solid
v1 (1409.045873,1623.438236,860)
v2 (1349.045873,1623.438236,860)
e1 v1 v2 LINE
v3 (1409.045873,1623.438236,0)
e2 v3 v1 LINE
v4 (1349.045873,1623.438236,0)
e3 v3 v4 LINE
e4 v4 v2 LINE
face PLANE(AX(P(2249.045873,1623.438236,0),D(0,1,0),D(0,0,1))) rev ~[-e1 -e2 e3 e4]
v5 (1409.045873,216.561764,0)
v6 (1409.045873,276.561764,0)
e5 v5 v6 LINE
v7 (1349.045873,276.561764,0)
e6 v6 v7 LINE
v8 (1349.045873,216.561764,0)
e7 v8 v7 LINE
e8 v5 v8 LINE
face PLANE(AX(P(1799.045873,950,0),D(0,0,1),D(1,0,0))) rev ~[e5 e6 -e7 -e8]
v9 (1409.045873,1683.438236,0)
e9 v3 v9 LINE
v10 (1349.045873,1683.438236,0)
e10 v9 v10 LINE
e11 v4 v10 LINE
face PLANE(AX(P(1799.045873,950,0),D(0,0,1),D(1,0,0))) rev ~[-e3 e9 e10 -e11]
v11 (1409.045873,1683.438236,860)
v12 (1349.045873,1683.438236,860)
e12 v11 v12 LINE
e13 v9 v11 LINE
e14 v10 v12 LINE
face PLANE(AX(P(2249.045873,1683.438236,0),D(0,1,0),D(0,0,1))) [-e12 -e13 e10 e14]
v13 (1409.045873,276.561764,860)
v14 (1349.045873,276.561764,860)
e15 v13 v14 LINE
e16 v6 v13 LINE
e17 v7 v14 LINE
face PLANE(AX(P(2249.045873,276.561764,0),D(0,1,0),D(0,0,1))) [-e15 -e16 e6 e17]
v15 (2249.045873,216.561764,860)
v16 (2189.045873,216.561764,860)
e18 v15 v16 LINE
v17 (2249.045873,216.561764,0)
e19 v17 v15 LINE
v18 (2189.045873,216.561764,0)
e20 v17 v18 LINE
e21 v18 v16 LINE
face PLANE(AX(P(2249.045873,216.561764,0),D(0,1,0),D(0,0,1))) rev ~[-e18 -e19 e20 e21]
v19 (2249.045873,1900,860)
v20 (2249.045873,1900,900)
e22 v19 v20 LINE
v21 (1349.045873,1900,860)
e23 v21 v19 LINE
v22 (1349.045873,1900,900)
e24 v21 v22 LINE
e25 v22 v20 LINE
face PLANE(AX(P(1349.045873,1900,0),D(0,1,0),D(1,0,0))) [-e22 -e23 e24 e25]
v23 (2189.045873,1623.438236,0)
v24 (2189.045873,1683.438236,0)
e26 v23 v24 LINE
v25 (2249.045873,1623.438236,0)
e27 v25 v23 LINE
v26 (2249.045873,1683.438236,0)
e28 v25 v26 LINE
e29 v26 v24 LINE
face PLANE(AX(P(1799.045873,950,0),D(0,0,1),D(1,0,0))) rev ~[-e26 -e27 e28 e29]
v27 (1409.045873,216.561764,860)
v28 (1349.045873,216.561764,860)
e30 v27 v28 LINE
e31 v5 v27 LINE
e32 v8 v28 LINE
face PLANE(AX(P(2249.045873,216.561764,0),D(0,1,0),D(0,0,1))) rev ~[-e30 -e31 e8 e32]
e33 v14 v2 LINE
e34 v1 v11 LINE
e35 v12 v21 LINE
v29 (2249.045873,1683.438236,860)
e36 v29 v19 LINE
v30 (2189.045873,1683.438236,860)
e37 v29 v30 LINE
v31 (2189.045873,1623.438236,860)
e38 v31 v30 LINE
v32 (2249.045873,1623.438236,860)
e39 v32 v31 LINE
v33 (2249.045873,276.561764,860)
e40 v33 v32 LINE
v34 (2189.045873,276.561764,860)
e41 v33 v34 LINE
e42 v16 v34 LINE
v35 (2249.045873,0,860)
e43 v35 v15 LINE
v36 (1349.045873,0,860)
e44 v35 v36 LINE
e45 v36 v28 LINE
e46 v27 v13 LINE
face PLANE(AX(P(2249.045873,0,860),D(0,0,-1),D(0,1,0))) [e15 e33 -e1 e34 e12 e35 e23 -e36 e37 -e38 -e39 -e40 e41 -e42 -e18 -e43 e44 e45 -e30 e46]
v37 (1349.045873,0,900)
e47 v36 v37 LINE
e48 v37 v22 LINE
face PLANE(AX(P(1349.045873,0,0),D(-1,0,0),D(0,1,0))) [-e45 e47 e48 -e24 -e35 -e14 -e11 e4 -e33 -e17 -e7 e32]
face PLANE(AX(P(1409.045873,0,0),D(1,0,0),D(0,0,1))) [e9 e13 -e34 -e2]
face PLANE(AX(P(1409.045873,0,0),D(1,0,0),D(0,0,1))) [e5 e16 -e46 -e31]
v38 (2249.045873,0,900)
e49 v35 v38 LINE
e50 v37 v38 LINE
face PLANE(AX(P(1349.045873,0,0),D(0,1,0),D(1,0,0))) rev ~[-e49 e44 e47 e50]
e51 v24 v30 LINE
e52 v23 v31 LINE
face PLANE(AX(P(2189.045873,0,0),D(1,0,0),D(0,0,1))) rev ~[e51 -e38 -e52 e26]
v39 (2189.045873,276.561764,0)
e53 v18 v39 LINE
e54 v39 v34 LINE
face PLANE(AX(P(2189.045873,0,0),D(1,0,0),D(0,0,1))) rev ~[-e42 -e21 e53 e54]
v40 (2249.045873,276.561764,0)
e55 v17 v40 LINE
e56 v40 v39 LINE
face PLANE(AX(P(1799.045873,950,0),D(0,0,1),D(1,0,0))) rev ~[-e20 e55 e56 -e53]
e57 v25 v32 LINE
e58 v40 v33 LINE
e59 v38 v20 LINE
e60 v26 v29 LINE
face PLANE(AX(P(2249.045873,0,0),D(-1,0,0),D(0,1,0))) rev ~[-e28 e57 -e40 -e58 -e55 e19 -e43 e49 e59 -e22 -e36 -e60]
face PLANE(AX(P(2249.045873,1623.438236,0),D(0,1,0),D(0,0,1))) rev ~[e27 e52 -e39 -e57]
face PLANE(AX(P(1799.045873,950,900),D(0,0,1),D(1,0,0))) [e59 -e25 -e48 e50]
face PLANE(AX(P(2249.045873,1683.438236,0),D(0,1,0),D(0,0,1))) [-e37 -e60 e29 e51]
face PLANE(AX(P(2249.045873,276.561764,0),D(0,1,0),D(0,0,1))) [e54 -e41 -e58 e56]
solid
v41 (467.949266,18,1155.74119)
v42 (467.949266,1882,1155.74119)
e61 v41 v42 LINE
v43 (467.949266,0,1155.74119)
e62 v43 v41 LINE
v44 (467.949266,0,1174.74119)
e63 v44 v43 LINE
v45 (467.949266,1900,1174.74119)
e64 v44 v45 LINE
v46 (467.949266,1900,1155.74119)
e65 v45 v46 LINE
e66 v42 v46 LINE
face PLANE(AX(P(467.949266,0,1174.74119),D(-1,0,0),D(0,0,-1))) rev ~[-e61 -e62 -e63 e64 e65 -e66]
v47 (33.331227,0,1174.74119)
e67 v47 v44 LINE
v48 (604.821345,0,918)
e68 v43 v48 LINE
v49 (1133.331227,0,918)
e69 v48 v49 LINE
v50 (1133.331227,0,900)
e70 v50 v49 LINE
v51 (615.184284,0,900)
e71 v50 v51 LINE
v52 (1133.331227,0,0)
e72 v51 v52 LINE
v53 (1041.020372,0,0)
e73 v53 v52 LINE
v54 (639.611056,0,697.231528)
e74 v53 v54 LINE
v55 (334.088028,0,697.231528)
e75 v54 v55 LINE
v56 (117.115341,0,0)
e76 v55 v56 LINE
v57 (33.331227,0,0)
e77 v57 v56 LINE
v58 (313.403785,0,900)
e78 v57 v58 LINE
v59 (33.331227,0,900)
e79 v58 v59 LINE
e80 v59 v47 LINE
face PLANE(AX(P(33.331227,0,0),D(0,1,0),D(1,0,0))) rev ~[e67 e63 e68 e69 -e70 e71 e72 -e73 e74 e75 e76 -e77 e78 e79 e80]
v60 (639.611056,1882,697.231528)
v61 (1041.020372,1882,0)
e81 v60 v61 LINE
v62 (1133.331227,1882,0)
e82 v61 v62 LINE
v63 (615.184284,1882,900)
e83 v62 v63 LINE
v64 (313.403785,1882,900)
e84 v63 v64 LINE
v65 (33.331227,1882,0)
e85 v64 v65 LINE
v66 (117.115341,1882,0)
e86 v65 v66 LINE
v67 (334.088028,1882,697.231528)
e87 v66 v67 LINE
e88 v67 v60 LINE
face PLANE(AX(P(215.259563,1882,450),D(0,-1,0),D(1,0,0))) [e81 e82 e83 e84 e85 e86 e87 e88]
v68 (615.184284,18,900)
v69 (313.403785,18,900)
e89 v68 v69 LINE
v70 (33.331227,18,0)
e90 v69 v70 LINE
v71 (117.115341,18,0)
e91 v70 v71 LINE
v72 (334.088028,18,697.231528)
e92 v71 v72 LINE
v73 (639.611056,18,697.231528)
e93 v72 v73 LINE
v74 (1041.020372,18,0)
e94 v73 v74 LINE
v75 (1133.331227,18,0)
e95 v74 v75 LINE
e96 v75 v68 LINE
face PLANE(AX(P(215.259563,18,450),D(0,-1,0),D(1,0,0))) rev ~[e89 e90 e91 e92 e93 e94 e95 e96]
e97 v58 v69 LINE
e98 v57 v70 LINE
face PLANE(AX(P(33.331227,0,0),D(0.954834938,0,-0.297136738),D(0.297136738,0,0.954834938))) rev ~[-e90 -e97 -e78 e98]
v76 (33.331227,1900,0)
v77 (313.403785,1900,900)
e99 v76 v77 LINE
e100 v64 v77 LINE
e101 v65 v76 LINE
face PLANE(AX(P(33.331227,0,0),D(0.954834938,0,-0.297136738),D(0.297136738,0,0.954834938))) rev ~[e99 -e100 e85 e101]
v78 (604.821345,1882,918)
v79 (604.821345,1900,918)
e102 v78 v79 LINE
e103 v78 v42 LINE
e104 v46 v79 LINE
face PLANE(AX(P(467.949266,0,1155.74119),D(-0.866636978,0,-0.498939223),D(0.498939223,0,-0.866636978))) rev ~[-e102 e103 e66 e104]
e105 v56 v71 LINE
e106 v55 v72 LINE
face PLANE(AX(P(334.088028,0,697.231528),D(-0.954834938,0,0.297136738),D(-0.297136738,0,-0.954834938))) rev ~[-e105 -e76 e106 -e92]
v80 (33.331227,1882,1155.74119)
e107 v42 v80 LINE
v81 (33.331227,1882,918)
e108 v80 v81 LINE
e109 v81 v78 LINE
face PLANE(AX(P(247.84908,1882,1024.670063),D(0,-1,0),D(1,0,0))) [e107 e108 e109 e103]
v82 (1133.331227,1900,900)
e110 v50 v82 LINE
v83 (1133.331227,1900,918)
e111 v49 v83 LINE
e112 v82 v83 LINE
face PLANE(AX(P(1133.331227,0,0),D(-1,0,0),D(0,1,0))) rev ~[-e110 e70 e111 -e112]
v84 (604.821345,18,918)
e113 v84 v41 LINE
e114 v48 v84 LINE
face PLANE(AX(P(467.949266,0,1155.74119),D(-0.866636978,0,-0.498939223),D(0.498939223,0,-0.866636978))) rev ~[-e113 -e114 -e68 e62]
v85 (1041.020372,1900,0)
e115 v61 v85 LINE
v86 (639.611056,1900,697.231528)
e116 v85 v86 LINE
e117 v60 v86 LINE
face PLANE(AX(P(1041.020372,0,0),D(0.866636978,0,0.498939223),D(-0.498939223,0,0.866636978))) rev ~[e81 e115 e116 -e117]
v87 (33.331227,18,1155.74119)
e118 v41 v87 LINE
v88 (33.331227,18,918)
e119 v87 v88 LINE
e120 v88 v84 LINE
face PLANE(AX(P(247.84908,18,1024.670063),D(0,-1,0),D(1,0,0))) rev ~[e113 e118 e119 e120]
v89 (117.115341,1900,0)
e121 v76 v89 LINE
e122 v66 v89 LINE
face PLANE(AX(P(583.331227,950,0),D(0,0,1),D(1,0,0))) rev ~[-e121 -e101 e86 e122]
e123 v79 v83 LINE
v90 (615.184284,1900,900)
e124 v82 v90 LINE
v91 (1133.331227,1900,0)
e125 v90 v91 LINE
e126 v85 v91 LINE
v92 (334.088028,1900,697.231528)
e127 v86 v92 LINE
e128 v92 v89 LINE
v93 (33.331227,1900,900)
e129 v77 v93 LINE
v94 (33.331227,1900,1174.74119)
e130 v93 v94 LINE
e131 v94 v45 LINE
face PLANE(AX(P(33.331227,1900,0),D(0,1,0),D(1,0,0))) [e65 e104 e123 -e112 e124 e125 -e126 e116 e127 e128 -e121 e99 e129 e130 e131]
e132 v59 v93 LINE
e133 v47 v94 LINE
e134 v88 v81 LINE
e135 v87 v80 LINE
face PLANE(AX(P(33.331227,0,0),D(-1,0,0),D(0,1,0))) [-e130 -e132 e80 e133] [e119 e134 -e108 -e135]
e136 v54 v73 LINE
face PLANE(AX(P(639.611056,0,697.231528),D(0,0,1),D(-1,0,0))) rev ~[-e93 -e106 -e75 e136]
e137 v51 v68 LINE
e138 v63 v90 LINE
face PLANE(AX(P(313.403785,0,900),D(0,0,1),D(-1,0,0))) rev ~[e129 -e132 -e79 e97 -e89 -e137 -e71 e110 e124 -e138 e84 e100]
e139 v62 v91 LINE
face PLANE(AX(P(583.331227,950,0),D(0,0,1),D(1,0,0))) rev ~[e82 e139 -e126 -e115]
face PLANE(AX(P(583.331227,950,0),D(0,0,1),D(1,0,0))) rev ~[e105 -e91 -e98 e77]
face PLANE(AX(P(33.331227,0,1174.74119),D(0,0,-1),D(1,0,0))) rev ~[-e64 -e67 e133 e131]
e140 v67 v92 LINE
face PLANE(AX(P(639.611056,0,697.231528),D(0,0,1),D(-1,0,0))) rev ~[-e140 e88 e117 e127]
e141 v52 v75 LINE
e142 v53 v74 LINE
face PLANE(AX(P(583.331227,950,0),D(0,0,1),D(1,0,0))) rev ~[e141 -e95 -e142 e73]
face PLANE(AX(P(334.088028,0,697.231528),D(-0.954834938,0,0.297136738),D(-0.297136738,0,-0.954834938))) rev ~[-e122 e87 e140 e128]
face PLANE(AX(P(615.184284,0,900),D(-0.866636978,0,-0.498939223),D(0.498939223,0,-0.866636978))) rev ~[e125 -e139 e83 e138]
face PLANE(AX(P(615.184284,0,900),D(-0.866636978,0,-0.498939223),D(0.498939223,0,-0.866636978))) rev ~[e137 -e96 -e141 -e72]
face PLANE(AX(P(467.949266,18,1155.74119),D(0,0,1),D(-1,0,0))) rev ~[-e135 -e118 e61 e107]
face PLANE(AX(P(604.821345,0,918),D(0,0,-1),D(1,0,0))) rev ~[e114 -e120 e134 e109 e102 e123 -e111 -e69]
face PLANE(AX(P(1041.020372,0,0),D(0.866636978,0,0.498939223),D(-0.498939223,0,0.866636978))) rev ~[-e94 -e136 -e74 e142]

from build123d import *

# Parameters (mm, degrees)
F0_W     = 1100
F0_H     = 1900
F1_DEPTH = 1500
F0_W_2   = 900
F2_DEPTH = 900
F3_W     = 780
F3_H     = 860
F4_DEPTH = 1900
F5_START = -18
F5_DEPTH = 1864
F8_W     = 216.5617644787
F8_H     = 860
F8_W_2   = 1346.8764710426
F9_DEPTH = 900


# Not quite as in the source:
# - a feature of the source that left no trace in its solid (it failed there, or was rolled back) is left out


with BuildPart() as f1:
    # F0 (on Top) → F1 (new body)
    with BuildSketch(Plane.XY):
        with Locations((583.3312265575, 950)):
            Rectangle(F0_W, F0_H)
    extrude(amount=F1_DEPTH)


with BuildPart() as f2:
    # F0 (on Top) → F2 (new body)
    with BuildSketch(Plane.XY):
        with Locations((1799.0458726883, 950)):
            Rectangle(F0_W_2, F0_H)
    extrude(amount=F2_DEPTH)


with BuildPart() as f4_tool:
    # F3 (on face) → F4 (new body, through all)
    with BuildSketch(Plane.XZ):
        Polygon((33.3312265575, 900), (33.3312265575, 0), (313.4037852287, 900), align=None)
        Polygon((334.0880279243, 697.2315277786), (117.1153412896, 0), (1041.0203720349, 0), (639.6110557539, 697.2315277786), align=None)
        Polygon((615.1842835989, 900), (1133.3312265575, 0), (1133.3312265575, 900), (769.4745531541, 900), align=None)
        Polygon((33.3312265575, 1500), (33.3312265575, 1174.7411898097), (467.9492661672, 1174.7411898097), (467.9492661672, 1155.7411898097), (604.8213447397, 918), (1133.3312265575, 918), (1133.3312265575, 1500), align=None)
        with Locations((1799.0458726883, 430)):
            Rectangle(F3_W, F3_H)
    extrude(amount=-F4_DEPTH)


with BuildPart() as f1_1:
    add(f1.part)

    # F4: cut by f4_tool
    add(f4_tool.part, mode=Mode.SUBTRACT)

    # F3 (on face) → F5 (cut)
    with BuildSketch(Plane.XZ.offset(F5_START)):
        Polygon((313.4037852287, 900), (33.3312265575, 0), (117.1153412896, 0), (334.0880279243, 697.2315277786), (397.1878999609, 900), align=None)
        Polygon((522.8734290762, 900), (397.1878999609, 900), (334.0880279243, 697.2315277786), (639.6110557539, 697.2315277786), align=None)
        Polygon((33.3312265575, 1155.7411898097), (33.3312265575, 918), (512.5104902171, 918), (375.6384116446, 1155.7411898097), align=None)
        Polygon((639.6110557539, 697.2315277786), (1041.0203720349, 0), (1133.3312265575, 0), (615.1842835989, 900), (522.8734290762, 900), align=None)
        Polygon((375.6384116446, 1155.7411898097), (512.5104902171, 918), (584.0514024721, 918), (447.1793238996, 1155.7411898097), align=None)
        Polygon((447.1793238996, 1155.7411898097), (584.0514024721, 918), (604.8213447397, 918), (467.9492661672, 1155.7411898097), align=None)
    extrude(amount=-F5_DEPTH, mode=Mode.SUBTRACT)


with BuildPart() as f2_1:
    add(f2.part)

    # F4: cut by f4_tool
    add(f4_tool.part, mode=Mode.SUBTRACT)

    # F8 (on face) → F9 (cut, through all)
    with BuildSketch(Plane.YZ.offset(2249.0458726883)):
        with Locations((108.2808822393, 430)):
            Rectangle(F8_W, F8_H)
        with Locations((950, 430)):
            Rectangle(F8_W_2, F8_H)
        with Locations((1791.7191177607, 430)):
            Rectangle(F8_W, F8_H)
    extrude(amount=-F9_DEPTH, mode=Mode.SUBTRACT)


solid = Compound([f1_1.part, f2_1.part])
